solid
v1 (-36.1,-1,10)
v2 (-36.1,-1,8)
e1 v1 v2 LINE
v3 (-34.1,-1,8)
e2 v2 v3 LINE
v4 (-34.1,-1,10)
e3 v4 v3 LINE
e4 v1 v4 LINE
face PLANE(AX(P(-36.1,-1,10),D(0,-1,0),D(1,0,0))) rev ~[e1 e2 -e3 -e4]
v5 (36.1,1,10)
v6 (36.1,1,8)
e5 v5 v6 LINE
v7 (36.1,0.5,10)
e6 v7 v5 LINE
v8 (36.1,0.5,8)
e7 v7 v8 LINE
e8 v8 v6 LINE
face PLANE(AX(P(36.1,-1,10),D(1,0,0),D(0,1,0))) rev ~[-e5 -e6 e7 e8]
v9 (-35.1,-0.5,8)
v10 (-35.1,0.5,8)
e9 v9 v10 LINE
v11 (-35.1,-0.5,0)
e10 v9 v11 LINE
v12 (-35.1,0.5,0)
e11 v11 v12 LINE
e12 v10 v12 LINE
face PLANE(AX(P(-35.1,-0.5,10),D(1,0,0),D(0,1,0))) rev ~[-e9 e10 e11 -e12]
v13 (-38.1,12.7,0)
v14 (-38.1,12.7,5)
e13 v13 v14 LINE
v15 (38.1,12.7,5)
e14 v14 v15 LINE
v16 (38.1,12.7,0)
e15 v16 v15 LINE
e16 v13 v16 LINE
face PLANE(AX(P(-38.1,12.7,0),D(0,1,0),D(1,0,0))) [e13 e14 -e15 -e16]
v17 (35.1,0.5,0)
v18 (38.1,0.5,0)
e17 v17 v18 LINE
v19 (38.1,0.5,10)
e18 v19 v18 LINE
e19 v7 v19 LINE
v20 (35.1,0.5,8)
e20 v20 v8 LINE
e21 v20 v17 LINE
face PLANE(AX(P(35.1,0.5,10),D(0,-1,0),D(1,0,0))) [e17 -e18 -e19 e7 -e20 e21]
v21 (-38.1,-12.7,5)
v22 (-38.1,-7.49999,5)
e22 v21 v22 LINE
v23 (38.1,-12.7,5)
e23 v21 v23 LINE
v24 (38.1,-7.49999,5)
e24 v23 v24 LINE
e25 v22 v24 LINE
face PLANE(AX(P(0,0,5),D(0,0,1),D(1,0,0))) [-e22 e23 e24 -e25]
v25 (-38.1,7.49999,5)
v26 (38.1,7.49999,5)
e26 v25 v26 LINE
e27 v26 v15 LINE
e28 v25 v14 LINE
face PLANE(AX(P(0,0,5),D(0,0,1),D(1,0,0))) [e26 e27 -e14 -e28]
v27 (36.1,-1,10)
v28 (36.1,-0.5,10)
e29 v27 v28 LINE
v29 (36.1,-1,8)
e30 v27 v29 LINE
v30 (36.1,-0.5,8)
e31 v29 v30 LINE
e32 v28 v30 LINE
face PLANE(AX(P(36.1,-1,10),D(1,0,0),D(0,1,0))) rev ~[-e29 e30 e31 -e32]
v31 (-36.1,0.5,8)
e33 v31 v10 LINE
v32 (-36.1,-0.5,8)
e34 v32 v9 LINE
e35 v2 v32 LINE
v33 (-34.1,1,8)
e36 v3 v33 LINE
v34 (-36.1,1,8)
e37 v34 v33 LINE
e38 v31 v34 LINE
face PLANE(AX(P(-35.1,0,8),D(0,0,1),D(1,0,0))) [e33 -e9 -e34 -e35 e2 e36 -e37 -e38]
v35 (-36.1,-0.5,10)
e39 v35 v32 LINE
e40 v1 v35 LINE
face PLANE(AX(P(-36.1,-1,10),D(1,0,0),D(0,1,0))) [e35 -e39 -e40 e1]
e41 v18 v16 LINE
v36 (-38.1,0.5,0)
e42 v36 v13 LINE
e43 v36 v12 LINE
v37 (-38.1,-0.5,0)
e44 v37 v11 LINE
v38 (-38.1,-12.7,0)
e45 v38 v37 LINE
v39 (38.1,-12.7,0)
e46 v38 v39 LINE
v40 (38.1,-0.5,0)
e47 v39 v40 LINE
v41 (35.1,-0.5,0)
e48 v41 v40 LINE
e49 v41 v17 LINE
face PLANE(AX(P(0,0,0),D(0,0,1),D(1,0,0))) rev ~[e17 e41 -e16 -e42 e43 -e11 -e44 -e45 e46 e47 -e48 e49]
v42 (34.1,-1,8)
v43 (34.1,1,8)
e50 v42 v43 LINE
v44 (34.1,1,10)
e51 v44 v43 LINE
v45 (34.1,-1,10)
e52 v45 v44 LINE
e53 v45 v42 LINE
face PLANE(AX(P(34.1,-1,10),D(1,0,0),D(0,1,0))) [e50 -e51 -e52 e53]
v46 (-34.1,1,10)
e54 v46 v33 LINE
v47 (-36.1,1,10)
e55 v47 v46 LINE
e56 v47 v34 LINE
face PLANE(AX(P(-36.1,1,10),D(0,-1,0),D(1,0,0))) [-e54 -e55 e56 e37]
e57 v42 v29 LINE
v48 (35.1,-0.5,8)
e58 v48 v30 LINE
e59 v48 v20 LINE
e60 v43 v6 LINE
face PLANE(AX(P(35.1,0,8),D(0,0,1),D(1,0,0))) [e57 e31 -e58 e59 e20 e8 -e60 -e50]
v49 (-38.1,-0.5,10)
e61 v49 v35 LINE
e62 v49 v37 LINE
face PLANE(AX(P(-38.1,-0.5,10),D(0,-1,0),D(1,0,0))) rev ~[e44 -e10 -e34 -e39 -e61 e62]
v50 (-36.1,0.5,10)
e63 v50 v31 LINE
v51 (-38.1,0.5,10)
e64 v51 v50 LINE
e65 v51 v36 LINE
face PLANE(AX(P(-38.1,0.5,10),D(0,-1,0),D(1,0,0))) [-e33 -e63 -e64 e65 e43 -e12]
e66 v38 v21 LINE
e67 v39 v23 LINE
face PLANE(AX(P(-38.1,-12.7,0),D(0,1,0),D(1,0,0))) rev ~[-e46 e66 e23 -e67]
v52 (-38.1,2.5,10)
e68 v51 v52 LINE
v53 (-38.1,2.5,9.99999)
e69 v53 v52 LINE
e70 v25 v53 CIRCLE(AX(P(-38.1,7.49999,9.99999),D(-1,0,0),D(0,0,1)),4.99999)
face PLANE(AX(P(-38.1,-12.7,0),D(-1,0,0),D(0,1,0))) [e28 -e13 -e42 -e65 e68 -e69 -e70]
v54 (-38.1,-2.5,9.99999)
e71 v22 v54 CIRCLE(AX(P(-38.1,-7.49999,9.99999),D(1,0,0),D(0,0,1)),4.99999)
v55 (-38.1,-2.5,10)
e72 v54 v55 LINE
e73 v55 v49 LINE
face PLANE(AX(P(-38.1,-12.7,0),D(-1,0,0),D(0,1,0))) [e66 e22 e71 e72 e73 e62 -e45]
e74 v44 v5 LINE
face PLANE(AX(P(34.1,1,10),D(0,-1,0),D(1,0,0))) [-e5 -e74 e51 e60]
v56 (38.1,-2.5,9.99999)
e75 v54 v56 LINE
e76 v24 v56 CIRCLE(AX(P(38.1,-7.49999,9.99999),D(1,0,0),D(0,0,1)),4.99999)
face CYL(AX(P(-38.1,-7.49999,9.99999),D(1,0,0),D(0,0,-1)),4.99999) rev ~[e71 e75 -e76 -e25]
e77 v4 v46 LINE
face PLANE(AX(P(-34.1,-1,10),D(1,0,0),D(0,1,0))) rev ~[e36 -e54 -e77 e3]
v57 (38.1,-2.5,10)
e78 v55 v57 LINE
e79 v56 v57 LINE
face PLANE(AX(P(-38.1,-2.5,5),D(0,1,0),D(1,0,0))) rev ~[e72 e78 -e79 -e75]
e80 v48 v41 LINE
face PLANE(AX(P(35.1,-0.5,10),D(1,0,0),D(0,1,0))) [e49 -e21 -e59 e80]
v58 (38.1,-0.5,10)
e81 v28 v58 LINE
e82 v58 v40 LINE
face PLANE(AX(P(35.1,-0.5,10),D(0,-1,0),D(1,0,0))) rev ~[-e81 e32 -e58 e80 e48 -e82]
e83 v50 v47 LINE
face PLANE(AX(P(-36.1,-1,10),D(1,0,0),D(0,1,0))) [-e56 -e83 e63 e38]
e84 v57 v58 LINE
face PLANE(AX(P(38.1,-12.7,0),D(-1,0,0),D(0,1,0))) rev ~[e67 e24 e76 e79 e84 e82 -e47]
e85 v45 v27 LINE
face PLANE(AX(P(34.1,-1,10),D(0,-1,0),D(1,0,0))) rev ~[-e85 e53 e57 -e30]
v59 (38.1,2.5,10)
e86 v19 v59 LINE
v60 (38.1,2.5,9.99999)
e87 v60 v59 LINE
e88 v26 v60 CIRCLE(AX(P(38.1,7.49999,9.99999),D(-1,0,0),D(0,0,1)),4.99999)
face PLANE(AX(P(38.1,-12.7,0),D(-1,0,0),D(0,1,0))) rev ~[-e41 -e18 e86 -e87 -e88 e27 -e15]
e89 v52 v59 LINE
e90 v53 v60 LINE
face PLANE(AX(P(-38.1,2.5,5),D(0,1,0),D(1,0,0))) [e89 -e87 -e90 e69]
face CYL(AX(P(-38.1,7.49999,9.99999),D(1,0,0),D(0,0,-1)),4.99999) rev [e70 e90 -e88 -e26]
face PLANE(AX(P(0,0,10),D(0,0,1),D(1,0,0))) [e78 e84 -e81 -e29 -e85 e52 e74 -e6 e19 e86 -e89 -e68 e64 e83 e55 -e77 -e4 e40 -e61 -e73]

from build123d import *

# Parameters (mm, degrees)
F0_W     = 76.2
F0_H     = 25.4
F1_DEPTH = 5
F2_W     = 76.2
F2_H     = 5
F3_DEPTH = 5
F4_R     = 4.99999
F5_W     = 2
F5_H     = 2
F7_DEPTH = 2
F6_W     = 3
F6_H     = 1
F8_DEPTH = 10.001


# Not quite as in the source:
# - a fillet or chamfer is up to 0.001 mm smaller than in the source, because OpenCascade refuses the exact size


with BuildPart() as f1:
    # F0 (on Top) → F1 (new body)
    with BuildSketch(Plane.XY):
        Rectangle(F0_W, F0_H)
    extrude(amount=F1_DEPTH)

    # F2 (on face) → F3 (join)
    with BuildSketch(Plane.XY.offset(5)):
        Rectangle(F2_W, F2_H)
    extrude(amount=F3_DEPTH)

    # F4 (radius 5 in the source; OpenCascade refuses exactly that, so slightly less here)
    f4_edges = [f1.edges().sort_by_distance(p)[0] for p in [
        (0, -2.5, 5),
        (0, 2.5, 5),
    ]]
    fillet(f4_edges, radius=F4_R)

    # F5 (on face) → F7 (cut)
    with BuildSketch(Plane.XY.offset(10)):
        with Locations((35.1, 0)):
            Rectangle(F5_W, F5_H)
        with Locations((-35.1, 0)):
            Rectangle(F5_W, F5_H)
    extrude(amount=-F7_DEPTH, mode=Mode.SUBTRACT)

    # F6 (on face) → F8 (cut, through all)
    with BuildSketch(Plane.XY.offset(10)):
        with Locations((36.6, 0)):
            Rectangle(F6_W, F6_H)
        with Locations((-36.6, 0)):
            Rectangle(F6_W, F6_H)
    extrude(amount=-F8_DEPTH, mode=Mode.SUBTRACT)


solid = f1.part
